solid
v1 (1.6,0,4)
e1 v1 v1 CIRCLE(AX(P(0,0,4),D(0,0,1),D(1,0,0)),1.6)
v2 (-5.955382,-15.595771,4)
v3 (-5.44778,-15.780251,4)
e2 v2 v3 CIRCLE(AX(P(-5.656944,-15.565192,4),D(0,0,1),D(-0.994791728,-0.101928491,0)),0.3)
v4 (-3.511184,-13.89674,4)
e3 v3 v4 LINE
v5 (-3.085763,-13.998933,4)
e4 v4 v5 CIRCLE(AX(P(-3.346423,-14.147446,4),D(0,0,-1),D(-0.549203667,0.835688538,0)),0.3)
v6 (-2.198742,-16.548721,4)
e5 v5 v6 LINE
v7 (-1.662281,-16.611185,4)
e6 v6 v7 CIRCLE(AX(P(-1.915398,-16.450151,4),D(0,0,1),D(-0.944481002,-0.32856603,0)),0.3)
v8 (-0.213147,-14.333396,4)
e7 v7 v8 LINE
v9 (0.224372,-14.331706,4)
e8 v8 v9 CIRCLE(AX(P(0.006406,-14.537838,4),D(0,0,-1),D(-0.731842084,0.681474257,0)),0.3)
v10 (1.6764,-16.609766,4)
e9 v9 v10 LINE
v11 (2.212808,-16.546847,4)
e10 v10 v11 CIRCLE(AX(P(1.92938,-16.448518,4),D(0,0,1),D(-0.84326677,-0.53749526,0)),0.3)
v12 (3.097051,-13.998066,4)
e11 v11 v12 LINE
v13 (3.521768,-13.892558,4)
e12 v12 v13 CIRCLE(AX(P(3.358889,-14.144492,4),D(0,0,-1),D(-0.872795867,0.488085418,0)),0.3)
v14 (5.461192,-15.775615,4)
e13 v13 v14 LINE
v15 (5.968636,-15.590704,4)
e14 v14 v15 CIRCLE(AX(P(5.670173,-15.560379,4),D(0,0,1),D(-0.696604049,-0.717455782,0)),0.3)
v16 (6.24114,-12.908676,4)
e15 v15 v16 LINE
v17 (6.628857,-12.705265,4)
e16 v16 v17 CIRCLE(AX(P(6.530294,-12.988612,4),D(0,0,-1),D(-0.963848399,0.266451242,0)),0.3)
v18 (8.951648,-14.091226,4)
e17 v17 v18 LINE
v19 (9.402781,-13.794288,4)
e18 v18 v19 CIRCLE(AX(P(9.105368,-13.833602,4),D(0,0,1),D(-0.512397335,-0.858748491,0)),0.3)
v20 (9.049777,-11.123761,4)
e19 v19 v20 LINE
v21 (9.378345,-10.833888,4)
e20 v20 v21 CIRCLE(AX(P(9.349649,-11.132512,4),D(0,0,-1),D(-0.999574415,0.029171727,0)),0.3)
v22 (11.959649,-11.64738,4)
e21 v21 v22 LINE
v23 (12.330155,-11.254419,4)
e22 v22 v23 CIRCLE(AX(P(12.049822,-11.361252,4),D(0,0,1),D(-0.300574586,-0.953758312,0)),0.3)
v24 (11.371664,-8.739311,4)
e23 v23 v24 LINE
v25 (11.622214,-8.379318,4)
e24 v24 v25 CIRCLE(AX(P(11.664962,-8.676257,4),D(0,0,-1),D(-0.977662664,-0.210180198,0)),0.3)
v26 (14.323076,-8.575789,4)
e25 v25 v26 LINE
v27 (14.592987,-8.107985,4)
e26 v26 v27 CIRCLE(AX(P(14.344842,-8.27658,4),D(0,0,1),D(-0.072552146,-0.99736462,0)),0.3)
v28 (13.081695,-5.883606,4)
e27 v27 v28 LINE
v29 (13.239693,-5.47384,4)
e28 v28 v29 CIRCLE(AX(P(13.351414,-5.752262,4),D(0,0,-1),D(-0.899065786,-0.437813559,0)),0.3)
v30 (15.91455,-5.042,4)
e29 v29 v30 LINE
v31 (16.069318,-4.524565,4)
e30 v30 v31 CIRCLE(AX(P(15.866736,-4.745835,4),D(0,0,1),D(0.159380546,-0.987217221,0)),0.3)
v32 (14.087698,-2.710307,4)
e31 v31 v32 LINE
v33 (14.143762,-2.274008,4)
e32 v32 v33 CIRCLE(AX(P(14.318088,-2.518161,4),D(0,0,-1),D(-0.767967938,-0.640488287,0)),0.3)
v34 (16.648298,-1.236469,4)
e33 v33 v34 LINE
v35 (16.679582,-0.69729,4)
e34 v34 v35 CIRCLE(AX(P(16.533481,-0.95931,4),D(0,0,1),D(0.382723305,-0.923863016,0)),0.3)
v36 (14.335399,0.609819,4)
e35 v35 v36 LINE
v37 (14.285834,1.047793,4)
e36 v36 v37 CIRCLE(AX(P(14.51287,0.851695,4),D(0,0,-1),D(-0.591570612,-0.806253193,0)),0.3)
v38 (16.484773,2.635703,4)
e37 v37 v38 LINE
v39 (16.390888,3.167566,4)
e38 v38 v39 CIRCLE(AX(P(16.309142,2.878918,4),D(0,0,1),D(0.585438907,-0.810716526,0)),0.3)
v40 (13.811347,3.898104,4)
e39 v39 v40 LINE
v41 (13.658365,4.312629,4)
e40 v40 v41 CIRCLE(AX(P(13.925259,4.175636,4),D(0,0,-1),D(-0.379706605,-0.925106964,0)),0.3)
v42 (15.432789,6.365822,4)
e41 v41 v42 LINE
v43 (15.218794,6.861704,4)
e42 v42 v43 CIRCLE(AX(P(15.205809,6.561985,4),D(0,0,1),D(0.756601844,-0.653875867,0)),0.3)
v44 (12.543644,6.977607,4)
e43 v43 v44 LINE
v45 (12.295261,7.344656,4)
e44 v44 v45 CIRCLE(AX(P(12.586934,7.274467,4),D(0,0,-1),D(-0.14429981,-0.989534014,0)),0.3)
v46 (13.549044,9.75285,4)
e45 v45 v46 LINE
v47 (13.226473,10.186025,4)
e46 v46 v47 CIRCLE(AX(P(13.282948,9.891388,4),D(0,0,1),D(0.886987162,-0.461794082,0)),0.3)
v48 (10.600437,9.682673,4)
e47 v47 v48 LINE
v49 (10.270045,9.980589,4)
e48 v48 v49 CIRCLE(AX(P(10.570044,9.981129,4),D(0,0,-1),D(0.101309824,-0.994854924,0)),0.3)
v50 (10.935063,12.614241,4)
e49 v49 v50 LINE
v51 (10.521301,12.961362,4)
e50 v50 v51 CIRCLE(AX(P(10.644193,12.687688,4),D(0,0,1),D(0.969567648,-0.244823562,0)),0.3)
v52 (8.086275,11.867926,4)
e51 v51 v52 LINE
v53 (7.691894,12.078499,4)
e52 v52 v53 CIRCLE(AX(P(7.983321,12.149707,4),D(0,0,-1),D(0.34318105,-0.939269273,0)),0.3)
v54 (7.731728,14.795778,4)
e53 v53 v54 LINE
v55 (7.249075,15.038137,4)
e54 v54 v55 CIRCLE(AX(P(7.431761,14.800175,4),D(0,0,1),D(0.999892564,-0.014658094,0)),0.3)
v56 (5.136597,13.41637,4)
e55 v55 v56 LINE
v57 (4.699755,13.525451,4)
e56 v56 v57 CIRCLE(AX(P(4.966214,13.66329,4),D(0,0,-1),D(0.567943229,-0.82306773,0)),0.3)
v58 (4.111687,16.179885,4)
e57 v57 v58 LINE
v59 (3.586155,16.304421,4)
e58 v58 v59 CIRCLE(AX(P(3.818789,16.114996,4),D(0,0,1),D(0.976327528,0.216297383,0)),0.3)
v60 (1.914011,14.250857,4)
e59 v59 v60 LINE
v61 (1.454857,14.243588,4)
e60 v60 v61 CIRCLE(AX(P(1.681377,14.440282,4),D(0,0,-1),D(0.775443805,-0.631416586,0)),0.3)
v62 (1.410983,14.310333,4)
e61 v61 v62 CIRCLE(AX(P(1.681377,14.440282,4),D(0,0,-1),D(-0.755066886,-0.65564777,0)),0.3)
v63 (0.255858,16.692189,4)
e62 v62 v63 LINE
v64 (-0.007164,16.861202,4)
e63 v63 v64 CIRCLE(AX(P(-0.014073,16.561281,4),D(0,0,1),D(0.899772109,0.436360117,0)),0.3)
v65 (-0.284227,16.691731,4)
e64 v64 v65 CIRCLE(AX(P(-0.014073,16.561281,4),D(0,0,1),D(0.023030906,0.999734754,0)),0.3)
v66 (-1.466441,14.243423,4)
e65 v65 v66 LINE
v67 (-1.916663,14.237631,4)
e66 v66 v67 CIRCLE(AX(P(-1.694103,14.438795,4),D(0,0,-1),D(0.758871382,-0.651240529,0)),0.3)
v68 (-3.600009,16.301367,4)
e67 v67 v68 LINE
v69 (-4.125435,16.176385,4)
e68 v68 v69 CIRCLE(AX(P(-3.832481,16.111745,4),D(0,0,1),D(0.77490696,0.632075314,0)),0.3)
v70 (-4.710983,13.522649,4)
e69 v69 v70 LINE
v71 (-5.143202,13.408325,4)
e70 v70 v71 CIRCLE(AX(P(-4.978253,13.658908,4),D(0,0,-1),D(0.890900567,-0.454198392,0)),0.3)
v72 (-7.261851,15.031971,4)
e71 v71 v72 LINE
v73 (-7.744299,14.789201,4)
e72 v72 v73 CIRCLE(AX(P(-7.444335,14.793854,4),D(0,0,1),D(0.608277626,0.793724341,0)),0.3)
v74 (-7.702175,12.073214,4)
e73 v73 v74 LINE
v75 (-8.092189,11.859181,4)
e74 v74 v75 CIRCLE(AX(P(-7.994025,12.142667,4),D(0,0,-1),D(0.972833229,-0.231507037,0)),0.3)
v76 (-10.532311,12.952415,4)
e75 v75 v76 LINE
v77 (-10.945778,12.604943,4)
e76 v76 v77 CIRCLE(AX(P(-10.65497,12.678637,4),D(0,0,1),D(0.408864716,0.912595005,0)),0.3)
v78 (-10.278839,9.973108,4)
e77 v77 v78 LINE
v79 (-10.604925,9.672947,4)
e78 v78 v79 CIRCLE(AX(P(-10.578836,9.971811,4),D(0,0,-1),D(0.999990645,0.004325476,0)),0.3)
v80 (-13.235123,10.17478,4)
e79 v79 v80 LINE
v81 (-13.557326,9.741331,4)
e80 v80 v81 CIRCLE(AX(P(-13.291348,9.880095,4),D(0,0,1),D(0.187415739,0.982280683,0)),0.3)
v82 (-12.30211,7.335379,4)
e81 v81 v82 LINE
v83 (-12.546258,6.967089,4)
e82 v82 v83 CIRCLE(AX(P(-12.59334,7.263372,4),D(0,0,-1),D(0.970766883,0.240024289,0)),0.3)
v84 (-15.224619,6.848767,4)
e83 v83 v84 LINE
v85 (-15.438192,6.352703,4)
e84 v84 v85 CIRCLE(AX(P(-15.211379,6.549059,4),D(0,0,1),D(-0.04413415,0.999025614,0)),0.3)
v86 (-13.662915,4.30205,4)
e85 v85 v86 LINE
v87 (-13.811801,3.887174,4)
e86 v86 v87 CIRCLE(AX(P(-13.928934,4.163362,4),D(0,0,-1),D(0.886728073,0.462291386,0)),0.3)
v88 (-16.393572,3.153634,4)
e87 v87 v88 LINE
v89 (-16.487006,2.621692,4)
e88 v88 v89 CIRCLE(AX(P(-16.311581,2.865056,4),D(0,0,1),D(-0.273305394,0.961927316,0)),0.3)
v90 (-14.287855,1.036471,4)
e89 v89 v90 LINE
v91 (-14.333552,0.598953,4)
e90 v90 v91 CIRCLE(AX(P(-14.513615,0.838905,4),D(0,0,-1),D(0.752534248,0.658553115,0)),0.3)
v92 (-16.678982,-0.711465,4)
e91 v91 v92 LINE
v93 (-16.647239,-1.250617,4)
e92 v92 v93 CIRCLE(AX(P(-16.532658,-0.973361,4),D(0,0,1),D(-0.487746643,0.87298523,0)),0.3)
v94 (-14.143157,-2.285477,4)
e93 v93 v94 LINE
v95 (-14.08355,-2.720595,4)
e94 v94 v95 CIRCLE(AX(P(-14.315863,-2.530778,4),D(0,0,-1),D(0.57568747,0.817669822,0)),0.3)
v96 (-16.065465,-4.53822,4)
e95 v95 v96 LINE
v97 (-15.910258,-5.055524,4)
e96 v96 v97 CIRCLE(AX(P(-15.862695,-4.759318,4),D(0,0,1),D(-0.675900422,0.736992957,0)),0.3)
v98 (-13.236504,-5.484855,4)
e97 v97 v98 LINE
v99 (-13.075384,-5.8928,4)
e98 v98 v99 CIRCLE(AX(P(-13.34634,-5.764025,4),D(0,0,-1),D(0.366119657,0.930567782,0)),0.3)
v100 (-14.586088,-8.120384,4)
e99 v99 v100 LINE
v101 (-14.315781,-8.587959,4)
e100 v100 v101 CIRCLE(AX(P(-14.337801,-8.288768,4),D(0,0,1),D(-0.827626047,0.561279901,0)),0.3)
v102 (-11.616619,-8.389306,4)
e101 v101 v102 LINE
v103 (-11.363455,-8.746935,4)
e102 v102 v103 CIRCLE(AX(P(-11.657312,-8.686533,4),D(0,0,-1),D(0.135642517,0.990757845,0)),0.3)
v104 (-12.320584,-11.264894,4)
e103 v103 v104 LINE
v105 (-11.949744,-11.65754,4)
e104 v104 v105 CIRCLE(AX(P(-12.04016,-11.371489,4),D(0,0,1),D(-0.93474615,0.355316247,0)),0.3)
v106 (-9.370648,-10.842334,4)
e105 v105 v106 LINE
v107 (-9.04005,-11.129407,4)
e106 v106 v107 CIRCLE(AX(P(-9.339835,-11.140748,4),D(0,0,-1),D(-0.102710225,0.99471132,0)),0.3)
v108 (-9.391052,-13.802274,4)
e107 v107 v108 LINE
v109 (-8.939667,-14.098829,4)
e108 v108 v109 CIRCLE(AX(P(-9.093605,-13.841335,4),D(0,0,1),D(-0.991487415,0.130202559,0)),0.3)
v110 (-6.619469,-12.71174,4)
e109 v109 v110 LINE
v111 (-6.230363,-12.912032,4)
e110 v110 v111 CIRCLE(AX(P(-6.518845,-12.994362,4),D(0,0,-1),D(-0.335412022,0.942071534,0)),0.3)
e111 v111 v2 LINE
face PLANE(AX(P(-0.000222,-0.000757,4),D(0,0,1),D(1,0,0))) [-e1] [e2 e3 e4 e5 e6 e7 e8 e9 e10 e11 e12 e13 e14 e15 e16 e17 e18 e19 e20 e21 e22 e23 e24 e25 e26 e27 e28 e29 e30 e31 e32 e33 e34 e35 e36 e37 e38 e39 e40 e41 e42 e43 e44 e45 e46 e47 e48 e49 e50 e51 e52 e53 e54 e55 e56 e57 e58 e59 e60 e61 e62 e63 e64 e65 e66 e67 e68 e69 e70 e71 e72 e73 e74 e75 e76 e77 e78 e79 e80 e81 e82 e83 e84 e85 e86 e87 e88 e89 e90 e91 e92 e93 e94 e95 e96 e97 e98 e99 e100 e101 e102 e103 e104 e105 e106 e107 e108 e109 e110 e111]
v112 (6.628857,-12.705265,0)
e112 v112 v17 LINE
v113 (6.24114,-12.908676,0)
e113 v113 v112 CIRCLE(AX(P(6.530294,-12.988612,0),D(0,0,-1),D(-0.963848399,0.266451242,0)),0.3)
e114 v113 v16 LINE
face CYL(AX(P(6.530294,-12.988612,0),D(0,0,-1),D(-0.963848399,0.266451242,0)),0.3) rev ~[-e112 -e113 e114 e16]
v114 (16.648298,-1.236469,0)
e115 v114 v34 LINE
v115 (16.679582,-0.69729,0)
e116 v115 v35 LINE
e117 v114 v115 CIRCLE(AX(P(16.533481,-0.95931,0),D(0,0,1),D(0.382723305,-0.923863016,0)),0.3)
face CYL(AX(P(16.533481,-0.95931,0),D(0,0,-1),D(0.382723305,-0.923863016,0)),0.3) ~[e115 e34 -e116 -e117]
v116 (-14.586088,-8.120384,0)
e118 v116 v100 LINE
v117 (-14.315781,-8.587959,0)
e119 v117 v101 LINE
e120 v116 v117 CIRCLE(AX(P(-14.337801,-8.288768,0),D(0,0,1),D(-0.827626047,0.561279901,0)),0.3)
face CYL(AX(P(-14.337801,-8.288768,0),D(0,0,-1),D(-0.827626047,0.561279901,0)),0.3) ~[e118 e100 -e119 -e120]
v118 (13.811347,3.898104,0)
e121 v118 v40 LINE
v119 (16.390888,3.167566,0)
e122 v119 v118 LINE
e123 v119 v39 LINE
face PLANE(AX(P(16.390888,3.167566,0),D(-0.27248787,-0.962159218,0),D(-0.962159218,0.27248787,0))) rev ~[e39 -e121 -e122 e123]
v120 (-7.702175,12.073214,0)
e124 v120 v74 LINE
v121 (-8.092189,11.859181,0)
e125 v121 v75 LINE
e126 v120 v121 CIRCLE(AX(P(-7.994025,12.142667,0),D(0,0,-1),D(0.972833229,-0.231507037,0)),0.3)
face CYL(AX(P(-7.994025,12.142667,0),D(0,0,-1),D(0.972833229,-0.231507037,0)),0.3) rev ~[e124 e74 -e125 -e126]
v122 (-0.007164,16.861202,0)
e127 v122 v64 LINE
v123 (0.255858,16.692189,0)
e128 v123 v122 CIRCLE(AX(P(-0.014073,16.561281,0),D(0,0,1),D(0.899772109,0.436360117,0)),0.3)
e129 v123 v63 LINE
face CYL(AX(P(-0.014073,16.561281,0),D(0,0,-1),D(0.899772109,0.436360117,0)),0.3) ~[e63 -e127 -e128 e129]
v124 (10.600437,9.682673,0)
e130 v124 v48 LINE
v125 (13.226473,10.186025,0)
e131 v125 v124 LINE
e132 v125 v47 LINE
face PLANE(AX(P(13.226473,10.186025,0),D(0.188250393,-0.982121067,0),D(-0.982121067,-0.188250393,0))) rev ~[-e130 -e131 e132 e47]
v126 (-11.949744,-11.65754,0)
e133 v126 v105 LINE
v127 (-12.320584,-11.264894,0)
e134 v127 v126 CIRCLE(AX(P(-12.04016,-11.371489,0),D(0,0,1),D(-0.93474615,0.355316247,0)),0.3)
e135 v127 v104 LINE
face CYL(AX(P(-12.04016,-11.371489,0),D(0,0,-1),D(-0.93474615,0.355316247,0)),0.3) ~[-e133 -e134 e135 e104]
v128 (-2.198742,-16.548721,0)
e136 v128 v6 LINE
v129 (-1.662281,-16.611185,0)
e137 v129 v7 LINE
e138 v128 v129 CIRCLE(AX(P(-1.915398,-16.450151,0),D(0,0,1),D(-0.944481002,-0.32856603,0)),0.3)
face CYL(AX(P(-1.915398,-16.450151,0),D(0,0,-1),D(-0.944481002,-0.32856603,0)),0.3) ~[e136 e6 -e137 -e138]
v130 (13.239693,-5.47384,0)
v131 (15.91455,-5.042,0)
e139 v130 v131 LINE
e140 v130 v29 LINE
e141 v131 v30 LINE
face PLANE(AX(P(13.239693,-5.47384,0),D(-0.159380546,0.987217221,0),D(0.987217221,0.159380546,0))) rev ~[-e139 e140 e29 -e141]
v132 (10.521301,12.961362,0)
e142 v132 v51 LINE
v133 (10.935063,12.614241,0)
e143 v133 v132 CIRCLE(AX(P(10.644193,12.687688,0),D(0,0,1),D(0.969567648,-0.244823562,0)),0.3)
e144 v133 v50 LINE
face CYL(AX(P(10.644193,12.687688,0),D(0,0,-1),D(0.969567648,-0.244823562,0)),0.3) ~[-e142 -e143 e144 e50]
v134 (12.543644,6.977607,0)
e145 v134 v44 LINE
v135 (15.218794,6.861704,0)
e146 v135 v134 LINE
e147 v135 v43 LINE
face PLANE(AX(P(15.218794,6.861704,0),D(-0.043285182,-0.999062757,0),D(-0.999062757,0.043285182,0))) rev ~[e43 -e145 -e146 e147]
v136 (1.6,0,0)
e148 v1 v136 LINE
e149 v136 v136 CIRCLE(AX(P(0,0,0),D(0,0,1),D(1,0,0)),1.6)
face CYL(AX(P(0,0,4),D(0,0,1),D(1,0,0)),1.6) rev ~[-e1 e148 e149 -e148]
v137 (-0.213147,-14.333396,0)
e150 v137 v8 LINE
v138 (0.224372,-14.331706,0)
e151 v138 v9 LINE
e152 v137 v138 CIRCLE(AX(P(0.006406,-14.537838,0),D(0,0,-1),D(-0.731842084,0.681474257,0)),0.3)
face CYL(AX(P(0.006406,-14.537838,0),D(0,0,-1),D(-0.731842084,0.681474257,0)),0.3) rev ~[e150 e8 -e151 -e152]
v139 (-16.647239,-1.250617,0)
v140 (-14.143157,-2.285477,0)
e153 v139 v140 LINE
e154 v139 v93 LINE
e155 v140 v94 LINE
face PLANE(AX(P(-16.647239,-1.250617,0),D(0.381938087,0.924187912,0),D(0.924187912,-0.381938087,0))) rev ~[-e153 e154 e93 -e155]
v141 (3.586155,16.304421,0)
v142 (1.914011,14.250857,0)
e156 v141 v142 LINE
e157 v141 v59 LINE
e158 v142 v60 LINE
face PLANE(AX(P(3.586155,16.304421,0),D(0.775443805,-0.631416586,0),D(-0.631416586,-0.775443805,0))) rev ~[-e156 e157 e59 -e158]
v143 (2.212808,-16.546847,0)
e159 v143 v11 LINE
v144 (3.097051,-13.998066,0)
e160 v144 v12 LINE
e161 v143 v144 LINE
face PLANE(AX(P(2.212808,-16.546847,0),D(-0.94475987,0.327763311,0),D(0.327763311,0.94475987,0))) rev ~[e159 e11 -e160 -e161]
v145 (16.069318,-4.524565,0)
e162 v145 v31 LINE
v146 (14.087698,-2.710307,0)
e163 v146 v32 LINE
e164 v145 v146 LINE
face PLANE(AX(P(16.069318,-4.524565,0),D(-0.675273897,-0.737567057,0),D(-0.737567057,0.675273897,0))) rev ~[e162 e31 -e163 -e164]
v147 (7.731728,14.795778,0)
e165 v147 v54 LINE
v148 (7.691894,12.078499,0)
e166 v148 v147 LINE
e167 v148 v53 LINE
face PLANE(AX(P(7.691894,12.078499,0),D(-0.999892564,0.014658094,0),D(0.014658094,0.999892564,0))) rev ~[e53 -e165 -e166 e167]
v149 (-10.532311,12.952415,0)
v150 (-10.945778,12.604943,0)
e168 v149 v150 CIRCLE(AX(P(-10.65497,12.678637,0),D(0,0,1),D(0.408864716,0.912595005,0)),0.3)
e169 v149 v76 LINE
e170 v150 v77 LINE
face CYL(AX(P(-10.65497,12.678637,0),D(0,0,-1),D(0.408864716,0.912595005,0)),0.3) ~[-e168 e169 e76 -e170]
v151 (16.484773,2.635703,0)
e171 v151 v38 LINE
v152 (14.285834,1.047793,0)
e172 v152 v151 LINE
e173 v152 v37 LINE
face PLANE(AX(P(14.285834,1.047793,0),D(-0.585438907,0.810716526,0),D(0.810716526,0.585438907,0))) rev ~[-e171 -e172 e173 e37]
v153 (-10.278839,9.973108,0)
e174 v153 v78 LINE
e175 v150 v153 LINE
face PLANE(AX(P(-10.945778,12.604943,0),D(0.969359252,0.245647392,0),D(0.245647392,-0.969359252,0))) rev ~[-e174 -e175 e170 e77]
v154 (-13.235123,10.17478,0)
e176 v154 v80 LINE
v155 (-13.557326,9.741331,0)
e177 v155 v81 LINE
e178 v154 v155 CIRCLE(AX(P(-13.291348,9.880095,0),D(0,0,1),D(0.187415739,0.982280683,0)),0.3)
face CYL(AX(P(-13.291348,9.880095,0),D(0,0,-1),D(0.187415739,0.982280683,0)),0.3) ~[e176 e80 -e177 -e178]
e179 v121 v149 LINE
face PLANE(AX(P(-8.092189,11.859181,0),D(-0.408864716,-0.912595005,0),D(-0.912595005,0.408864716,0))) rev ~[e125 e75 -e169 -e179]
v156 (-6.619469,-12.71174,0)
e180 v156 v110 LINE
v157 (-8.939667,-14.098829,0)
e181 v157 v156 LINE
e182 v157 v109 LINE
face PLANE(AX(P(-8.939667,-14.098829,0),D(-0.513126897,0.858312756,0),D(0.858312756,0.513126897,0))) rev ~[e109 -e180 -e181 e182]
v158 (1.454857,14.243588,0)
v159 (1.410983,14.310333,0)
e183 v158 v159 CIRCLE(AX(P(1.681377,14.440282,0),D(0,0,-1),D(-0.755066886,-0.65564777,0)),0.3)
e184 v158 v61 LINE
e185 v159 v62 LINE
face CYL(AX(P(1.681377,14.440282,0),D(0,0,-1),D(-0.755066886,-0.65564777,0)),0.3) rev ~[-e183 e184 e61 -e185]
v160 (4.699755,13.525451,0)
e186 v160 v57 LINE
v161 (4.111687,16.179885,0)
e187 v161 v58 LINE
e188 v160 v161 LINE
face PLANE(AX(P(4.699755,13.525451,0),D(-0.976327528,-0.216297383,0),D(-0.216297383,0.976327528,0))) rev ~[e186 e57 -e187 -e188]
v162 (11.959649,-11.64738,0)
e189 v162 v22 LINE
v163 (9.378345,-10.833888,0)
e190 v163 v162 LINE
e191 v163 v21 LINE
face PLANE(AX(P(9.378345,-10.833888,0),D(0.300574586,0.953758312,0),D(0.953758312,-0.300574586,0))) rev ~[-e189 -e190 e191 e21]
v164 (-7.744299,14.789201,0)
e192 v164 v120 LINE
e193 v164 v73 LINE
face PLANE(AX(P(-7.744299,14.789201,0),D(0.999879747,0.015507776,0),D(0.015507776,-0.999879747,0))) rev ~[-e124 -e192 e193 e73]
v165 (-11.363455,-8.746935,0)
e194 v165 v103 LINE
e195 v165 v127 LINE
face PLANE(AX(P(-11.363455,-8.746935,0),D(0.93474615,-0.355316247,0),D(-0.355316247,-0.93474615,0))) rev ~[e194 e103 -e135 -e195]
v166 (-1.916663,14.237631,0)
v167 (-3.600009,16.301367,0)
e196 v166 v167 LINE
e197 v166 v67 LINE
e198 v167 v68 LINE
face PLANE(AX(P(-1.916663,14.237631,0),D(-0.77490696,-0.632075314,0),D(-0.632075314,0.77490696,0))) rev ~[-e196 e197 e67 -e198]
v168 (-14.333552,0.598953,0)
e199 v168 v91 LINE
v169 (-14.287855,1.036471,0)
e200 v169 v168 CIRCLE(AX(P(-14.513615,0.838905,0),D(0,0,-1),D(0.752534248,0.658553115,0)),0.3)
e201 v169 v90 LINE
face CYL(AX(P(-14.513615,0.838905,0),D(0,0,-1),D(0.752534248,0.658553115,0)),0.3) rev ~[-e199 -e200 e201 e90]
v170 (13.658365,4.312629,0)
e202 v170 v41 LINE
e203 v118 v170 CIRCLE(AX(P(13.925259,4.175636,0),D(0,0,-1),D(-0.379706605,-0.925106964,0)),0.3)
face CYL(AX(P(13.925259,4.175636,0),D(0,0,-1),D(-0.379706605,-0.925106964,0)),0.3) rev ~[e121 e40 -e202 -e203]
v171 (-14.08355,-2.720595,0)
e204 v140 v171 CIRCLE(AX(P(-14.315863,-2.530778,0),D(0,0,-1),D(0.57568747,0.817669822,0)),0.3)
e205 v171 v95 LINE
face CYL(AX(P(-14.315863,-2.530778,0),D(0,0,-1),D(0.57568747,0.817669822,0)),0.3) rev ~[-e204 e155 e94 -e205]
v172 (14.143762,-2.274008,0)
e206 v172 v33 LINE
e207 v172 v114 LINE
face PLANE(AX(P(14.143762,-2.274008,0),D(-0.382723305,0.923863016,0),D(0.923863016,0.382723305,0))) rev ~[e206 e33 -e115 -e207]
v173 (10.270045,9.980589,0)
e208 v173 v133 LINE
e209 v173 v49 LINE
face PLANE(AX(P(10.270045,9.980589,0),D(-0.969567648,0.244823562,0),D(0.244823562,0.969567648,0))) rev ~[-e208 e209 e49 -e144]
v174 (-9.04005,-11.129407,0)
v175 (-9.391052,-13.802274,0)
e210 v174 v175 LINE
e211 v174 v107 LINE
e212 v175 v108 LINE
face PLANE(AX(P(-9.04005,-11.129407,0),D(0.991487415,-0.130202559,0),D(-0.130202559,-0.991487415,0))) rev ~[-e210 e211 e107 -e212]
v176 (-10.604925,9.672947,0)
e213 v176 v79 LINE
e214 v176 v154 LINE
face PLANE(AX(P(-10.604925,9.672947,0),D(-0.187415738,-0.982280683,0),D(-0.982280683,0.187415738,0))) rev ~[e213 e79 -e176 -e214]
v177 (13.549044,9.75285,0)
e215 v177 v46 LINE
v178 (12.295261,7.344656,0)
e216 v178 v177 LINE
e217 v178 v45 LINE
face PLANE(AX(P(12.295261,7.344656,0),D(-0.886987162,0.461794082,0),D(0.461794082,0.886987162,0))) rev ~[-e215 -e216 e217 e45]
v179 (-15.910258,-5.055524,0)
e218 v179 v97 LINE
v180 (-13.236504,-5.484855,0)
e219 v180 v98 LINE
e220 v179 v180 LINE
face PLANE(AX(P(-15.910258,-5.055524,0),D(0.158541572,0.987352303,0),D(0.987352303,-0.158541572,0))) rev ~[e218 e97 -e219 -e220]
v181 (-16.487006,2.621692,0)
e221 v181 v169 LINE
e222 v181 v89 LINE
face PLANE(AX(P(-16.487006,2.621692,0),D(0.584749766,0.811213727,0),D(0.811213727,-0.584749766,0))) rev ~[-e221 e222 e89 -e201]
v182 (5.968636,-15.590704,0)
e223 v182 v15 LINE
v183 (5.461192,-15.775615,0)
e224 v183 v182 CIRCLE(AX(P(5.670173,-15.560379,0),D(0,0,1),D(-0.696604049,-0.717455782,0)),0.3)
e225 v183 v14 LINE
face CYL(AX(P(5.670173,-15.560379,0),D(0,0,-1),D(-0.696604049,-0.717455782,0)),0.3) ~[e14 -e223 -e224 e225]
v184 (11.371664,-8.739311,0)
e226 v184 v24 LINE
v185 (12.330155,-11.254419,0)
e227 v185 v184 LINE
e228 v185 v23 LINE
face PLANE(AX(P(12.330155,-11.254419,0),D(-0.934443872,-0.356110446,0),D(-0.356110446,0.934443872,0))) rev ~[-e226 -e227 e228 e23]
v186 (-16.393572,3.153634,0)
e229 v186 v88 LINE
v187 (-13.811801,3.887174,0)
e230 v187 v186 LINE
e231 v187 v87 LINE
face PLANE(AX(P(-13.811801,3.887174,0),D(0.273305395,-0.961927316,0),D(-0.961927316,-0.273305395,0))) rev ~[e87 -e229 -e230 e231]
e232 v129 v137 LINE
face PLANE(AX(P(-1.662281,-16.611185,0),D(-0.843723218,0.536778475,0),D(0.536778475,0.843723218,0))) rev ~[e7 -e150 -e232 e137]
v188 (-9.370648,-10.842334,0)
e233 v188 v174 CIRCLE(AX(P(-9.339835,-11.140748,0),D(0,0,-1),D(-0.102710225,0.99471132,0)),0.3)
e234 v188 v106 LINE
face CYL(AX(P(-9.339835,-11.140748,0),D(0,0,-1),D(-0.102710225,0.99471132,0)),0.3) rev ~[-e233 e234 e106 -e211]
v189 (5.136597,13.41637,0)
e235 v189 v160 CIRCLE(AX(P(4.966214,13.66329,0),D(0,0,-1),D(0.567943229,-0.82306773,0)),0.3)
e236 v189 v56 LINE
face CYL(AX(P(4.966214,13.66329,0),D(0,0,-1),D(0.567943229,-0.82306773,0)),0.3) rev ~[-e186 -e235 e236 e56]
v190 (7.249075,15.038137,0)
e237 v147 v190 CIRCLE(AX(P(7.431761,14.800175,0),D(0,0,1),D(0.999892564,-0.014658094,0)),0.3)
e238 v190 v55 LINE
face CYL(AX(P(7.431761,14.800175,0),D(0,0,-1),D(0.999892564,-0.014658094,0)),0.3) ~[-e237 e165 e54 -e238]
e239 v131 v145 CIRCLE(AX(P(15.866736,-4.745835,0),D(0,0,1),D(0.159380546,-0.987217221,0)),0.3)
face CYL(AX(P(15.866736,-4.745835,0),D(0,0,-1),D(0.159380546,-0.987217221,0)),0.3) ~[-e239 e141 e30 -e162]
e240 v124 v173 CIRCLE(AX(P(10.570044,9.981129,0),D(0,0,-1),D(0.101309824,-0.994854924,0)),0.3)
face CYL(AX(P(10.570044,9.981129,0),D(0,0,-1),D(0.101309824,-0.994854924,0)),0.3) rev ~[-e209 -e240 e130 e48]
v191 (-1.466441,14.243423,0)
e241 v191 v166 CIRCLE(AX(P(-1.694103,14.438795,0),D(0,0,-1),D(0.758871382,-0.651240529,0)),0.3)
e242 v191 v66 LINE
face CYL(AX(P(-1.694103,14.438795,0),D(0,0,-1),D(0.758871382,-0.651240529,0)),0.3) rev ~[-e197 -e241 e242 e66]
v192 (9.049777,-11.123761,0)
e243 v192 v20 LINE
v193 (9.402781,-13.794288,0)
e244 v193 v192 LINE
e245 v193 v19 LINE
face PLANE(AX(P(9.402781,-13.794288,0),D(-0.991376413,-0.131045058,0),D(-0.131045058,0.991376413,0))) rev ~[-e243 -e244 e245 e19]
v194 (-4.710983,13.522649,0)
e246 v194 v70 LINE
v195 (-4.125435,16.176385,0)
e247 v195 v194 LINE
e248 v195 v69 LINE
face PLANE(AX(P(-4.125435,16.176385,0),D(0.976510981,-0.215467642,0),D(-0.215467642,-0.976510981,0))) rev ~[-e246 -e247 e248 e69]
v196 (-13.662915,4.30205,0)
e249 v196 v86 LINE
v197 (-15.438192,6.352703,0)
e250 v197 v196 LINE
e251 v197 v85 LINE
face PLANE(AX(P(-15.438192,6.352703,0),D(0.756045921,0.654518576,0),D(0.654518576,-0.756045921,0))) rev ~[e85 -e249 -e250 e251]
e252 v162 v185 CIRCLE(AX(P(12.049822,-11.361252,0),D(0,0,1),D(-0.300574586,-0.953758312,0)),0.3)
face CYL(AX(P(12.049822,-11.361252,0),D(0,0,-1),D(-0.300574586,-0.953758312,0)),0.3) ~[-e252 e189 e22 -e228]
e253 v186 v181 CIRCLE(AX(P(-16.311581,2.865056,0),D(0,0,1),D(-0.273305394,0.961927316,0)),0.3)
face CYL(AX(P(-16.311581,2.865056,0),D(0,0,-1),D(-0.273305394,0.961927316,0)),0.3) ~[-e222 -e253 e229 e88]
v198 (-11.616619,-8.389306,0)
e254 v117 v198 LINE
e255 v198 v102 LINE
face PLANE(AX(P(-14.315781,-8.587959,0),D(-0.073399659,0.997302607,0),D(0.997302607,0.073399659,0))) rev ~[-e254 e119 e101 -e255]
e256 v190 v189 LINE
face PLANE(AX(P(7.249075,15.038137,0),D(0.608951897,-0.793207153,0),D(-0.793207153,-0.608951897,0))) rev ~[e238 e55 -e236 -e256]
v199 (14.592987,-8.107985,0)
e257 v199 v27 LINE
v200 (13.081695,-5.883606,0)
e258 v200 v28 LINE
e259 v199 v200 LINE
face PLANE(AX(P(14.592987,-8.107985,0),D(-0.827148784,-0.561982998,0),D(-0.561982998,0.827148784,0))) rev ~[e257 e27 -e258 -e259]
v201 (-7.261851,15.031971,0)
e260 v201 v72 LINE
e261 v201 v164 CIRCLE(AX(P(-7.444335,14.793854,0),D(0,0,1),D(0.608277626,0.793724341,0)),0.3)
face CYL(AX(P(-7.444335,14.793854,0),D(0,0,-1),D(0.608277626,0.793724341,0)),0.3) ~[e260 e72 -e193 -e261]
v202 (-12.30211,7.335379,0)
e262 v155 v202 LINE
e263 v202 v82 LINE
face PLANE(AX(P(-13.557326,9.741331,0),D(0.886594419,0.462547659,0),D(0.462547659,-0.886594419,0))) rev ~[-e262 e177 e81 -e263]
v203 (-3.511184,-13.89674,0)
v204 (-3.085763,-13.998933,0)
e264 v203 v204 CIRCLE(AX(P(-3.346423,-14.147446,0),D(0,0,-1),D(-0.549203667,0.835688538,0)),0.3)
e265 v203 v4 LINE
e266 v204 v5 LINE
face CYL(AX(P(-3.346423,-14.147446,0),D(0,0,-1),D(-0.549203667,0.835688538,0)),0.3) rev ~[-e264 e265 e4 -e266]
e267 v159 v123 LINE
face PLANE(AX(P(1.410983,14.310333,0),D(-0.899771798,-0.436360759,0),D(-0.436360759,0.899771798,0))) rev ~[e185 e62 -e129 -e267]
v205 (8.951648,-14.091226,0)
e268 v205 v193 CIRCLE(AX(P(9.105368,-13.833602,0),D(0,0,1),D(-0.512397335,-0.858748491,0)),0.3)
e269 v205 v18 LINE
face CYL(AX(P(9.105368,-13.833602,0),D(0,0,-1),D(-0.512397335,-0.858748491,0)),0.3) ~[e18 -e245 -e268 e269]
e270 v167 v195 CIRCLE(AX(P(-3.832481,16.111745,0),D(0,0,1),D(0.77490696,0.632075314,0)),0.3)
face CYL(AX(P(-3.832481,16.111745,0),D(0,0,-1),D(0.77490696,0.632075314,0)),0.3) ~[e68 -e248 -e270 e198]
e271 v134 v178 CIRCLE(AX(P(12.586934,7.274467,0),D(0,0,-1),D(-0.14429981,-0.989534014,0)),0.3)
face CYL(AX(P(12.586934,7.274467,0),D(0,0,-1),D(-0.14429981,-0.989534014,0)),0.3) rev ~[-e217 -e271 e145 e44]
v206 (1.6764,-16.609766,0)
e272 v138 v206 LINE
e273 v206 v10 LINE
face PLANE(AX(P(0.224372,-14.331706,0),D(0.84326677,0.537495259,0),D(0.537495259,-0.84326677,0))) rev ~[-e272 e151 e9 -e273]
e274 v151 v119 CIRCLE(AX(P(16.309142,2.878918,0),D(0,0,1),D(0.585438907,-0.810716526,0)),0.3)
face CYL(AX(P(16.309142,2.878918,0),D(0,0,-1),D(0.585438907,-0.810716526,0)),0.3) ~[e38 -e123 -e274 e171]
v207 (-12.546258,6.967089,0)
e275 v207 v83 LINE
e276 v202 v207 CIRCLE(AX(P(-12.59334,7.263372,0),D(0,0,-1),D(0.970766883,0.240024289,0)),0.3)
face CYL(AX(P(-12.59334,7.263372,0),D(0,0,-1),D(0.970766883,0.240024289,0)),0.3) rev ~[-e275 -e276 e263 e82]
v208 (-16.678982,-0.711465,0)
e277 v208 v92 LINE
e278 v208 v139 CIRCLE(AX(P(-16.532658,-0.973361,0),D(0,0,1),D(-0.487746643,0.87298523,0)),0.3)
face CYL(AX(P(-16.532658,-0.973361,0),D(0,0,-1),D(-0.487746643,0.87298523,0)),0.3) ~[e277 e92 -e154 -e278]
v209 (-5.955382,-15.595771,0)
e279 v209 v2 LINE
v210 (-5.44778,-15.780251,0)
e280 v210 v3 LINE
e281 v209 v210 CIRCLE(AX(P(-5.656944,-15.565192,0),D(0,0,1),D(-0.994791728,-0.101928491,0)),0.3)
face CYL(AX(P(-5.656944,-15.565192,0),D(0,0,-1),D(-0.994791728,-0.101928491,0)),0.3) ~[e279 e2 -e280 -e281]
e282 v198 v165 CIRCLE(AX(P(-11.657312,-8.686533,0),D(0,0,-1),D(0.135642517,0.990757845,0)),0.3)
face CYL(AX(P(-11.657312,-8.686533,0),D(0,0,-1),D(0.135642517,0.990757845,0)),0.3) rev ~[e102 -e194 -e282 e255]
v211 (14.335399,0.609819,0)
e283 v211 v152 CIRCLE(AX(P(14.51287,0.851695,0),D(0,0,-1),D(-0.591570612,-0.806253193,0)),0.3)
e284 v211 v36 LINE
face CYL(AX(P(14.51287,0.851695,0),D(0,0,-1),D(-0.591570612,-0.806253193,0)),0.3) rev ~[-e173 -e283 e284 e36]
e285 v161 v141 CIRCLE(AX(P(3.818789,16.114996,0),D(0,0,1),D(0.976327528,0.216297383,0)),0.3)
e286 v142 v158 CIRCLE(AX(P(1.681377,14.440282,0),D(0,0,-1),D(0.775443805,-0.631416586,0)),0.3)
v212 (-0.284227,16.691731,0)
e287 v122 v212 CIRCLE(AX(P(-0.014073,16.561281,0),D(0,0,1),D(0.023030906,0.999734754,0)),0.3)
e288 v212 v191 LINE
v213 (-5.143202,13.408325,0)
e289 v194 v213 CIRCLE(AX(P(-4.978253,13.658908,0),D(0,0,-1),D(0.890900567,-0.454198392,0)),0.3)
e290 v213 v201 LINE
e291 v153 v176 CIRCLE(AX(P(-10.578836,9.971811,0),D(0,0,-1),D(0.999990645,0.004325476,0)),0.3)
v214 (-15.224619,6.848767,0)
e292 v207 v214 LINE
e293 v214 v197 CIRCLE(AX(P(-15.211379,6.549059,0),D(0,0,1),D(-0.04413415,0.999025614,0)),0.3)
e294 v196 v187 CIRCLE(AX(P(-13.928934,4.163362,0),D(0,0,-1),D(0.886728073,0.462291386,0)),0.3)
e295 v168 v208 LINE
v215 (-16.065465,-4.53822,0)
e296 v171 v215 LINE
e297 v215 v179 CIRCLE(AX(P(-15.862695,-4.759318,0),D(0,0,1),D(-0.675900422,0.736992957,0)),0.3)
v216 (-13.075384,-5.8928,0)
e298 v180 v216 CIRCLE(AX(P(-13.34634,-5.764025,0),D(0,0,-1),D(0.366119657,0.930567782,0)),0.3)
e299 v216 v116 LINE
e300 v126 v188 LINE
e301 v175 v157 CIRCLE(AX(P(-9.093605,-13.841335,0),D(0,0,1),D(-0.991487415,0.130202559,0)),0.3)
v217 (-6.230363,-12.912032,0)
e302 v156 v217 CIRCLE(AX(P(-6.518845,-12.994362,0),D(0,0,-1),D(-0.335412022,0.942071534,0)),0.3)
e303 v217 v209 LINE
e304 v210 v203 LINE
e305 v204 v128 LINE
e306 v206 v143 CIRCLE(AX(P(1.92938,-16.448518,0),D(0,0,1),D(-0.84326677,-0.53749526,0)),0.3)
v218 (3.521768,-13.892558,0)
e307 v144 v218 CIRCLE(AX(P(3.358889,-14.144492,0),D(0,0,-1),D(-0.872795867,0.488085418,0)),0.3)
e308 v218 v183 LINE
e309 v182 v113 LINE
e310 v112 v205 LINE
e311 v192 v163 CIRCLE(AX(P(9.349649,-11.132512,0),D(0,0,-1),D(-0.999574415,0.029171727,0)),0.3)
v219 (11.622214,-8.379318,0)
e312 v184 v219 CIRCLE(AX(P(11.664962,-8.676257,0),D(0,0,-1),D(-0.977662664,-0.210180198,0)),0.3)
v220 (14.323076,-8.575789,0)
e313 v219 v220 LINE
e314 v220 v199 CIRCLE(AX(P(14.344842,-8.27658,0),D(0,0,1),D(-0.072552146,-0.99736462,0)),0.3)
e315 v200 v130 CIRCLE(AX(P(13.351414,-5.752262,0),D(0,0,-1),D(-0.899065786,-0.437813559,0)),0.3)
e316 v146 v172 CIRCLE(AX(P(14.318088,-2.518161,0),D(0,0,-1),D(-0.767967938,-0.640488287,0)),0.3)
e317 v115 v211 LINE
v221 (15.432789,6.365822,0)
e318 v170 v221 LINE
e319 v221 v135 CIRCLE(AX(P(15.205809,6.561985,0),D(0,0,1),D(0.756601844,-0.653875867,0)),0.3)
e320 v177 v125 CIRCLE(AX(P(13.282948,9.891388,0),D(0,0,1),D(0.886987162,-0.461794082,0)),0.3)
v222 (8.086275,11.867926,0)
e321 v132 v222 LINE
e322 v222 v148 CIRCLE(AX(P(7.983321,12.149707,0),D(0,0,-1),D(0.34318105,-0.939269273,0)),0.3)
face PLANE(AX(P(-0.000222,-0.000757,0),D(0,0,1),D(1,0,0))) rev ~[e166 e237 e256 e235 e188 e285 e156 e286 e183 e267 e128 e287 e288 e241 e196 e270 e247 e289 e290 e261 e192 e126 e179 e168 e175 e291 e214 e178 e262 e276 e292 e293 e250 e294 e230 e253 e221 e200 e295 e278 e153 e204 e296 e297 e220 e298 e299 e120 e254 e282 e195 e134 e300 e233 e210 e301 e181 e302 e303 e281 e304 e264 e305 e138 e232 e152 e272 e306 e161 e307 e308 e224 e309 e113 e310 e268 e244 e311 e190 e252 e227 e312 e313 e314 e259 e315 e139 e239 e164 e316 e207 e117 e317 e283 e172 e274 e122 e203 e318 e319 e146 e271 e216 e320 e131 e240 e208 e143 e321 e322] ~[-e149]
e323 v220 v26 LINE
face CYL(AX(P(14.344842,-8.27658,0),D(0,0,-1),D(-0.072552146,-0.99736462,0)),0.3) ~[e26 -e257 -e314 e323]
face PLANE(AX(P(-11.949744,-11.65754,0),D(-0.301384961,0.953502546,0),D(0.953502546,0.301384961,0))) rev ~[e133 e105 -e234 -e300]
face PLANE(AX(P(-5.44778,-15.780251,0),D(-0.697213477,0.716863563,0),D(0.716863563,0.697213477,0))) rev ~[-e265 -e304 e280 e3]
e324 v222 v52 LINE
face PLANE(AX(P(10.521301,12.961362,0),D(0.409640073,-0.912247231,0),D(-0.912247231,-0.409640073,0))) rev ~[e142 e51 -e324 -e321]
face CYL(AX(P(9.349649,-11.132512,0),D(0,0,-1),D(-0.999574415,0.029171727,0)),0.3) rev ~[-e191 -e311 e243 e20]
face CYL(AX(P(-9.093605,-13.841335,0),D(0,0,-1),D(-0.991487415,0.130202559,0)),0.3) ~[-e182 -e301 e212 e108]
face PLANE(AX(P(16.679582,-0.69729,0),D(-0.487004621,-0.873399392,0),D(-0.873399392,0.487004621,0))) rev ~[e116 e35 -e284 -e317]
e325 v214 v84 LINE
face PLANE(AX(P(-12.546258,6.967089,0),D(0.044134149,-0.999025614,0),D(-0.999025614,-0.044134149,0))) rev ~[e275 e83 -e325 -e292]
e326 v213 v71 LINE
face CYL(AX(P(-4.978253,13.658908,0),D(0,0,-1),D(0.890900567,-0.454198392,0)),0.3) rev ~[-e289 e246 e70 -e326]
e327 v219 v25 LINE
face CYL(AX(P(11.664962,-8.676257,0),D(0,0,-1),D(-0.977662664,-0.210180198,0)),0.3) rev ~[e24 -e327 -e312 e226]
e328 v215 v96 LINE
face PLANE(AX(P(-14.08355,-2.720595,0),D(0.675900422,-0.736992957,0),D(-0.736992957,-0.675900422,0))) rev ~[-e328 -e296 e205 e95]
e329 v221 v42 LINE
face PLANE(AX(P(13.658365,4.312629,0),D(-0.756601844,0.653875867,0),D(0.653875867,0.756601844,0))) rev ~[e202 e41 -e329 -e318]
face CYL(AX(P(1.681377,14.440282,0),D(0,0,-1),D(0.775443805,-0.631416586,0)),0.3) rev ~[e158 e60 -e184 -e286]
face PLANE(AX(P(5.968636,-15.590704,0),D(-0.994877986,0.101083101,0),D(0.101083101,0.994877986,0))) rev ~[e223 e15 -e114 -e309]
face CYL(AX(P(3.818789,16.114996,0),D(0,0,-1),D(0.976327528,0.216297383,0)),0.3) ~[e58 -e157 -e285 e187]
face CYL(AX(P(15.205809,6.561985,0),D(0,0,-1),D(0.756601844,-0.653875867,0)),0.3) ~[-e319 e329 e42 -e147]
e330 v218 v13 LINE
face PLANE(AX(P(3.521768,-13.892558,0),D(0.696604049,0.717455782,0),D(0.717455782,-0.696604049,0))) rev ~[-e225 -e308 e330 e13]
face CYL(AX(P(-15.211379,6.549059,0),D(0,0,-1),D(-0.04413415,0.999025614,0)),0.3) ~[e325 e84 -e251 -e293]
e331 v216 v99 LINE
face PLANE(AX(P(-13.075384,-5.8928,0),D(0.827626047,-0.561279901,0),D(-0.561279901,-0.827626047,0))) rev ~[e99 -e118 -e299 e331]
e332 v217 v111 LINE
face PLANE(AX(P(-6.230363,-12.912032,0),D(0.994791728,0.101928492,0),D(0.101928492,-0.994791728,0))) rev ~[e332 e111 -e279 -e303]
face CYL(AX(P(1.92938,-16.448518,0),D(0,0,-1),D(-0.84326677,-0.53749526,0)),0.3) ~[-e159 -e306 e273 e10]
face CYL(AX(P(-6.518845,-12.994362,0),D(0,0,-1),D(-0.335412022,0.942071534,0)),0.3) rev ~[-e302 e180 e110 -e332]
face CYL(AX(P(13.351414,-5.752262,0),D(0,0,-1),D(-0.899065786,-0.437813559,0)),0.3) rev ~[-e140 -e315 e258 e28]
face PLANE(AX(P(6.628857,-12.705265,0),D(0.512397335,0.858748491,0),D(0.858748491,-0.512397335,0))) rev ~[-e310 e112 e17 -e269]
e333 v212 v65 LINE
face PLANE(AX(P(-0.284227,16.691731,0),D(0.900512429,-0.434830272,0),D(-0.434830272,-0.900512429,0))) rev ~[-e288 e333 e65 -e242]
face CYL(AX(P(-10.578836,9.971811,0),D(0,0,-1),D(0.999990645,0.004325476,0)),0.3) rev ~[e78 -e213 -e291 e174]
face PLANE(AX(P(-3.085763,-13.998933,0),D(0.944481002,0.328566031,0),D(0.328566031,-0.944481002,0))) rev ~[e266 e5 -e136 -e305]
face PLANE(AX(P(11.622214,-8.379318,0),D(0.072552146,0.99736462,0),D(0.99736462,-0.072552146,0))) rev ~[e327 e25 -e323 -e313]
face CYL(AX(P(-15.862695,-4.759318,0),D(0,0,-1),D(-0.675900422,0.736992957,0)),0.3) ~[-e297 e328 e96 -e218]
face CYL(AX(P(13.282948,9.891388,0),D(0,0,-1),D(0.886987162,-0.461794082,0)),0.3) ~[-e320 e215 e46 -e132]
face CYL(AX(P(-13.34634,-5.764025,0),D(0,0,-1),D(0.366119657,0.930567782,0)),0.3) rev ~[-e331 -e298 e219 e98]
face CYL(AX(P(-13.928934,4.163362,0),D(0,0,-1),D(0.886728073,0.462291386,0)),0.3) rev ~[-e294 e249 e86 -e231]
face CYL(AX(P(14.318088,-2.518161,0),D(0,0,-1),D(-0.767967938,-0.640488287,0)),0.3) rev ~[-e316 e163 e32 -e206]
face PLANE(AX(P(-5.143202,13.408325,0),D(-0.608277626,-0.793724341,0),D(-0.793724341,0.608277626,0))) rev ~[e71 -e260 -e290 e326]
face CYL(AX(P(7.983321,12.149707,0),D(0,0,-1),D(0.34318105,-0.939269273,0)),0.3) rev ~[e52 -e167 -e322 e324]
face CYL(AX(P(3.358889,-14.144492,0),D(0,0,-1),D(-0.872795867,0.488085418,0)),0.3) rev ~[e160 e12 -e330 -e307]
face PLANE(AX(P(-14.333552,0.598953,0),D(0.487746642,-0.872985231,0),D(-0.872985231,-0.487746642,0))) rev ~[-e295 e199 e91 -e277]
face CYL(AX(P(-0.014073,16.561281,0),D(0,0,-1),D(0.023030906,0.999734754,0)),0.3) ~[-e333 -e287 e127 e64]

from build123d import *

# Parameters (mm, degrees)
F1_DEPTH = 4
F2_R     = 1.6
F3_DEPTH = 4.001


# Not quite as in the source:
# - ends of sketch curves that miss each other by under 0.0002 mm in the source are joined


with BuildPart() as f1:
    # F0 (on Top) → F1 (new body)
    with BuildSketch(Plane.XY):
        with BuildLine():
            ThreePointArc((1.9140106254, 14.2508572736), (1.6861265158, 14.1403198405), (1.4548574179, 14.2435879186))
            ThreePointArc((1.4548574179, 14.2435879186), (1.4306890387, 14.2754935862), (1.4109831428, 14.3103326425))
            Line((1.4109831428, 14.3103326425), (0.2558581901, 16.6921894723))
            ThreePointArc((0.2558581901, 16.6921894723), (0.1481039871, 16.8136670177), (-0.0071641706, 16.8612018631))
            ThreePointArc((-0.0071641706, 16.8612018631), (-0.1706127192, 16.817202235), (-0.2842271711, 16.6917305187))
            Line((-0.2842271711, 16.6917305187), (-1.4664410979, 14.2434227482))
            ThreePointArc((-1.4664410979, 14.2434227482), (-1.6902437576, 14.1388197245), (-1.916663057, 14.237631282))
            Line((-1.916663057, 14.237631282), (-3.6000092117, 16.3013673957))
            ThreePointArc((-3.6000092117, 16.3013673957), (-3.9019049125, 16.4036015506), (-4.125434594, 16.1763850942))
            Line((-4.125434594, 16.1763850942), (-4.7109828334, 13.5226488797))
            ThreePointArc((-4.7109828334, 13.5226488797), (-4.9015400565, 13.3688823231), (-5.1432019185, 13.4083253663))
            Line((-5.1432019185, 13.4083253663), (-7.2618513891, 15.0319710101))
            ThreePointArc((-7.2618513891, 15.0319710101), (-7.579185331, 15.0618374778), (-7.7442986009, 14.7892013747))
            Line((-7.7442986009, 14.7892013747), (-7.702174618, 12.0732144933))
            ThreePointArc((-7.702174618, 12.0732144933), (-7.8496947229, 11.8796668128), (-8.0921885063, 11.8591814286))
            Line((-8.0921885063, 11.8591814286), (-10.532310636, 12.9524153773))
            ThreePointArc((-10.532310636, 12.9524153773), (-10.8479798704, 12.9083044823), (-10.9457778263, 12.604942658))
            Line((-10.9457778263, 12.604942658), (-10.2788390418, 9.9731081586))
            ThreePointArc((-10.2788390418, 9.9731081586), (-10.375659889, 9.7510858631), (-10.6049250215, 9.6729470431))
            Line((-10.6049250215, 9.6729470431), (-13.2351231204, 10.1747796938))
            ThreePointArc((-13.2351231204, 10.1747796938), (-13.5321144192, 10.0590688256), (-13.5573261675, 9.7413311912))
            Line((-13.5573261675, 9.7413311912), (-12.3021100194, 7.3353788314))
            ThreePointArc((-12.3021100194, 7.3353788314), (-12.3432937572, 7.097610167), (-12.5462575743, 6.967089184))
            Line((-12.5462575743, 6.967089184), (-15.2246187544, 6.8487666996))
            ThreePointArc((-15.2246187544, 6.8487666996), (-15.4869255508, 6.6676921814), (-15.4381922857, 6.3527034427))
            Line((-15.4381922857, 6.3527034427), (-13.6629152877, 4.3020497532))
            ThreePointArc((-13.6629152877, 4.3020497532), (-13.6465657396, 4.062029571), (-13.8118007442, 3.8871742342))
            Line((-13.8118007442, 3.8871742342), (-16.3935721919, 3.153634337))
            ThreePointArc((-16.3935721919, 3.153634337), (-16.6070572662, 2.9169553146), (-16.4870055032, 2.621692024))
            Line((-16.4870055032, 2.621692024), (-14.2878546387, 1.0364711274))
            ThreePointArc((-14.2878546387, 1.0364711274), (-14.2152379851, 0.8077409694), (-14.3335516124, 0.5989526815))
            Line((-14.3335516124, 0.5989526815), (-16.6789818187, -0.7114654884))
            ThreePointArc((-16.6789818187, -0.7114654884), (-16.832139234, -0.9909930232), (-16.6472392521, -1.2506174313))
            Line((-16.6472392521, -1.2506174313), (-14.1431571391, -2.2854765977))
            ThreePointArc((-14.1431571391, -2.2854765977), (-14.0186393167, -2.4900607643), (-14.0835502146, -2.7205948066))
            Line((-14.0835502146, -2.7205948066), (-16.0654652706, -4.5382203487))
            ThreePointArc((-16.0654652706, -4.5382203487), (-16.1500404943, -4.8455310516), (-15.9102576154, -5.0555239268))
            Line((-15.9102576154, -5.0555239268), (-13.2365040498, -5.4848550701))
            ThreePointArc((-13.2365040498, -5.4848550701), (-13.0673141606, -5.6538228156), (-13.0753841374, -5.8928002059))
            Line((-13.0753841374, -5.8928002059), (-14.5860884781, -8.1203844463))
            ThreePointArc((-14.5860884781, -8.1203844463), (-14.5975232656, -8.4389155785), (-14.3157807663, -8.5879591986))
            Line((-14.3157807663, -8.5879591986), (-11.6166191171, -8.3893058066))
            ThreePointArc((-11.6166191171, -8.3893058066), (-11.4124537807, -8.5131996233), (-11.3634554587, -8.746935215))
            Line((-11.3634554587, -8.746935215), (-12.3205835531, -11.2648943843))
            ThreePointArc((-12.3205835531, -11.2648943843), (-12.258261618, -11.5774784738), (-11.9497442197, -11.6575400221))
            Line((-11.9497442197, -11.6575400221), (-9.3706481648, -10.8423342647))
            ThreePointArc((-9.3706481648, -10.8423342647), (-9.143139116, -10.914229028), (-9.0400495076, -11.1294074585))
            Line((-9.0400495076, -11.1294074585), (-9.3910515674, -13.8022744624))
            ThreePointArc((-9.3910515674, -13.8022744624), (-9.2583317968, -14.0920645572), (-8.9396672739, -14.0988290571))
            Line((-8.9396672739, -14.0988290571), (-6.6194690015, -12.711740107))
            ThreePointArc((-6.6194690015, -12.711740107), (-6.3815431901, -12.7276255469), (-6.2303634454, -12.912031956))
            Line((-6.2303634454, -12.912031956), (-5.955381825, -15.5957706951))
            ThreePointArc((-5.955381825, -15.5957706951), (-5.7594172495, -15.8471483428), (-5.4477802634, -15.7802512165))
            Line((-5.4477802634, -15.7802512165), (-3.5111841497, -13.8967395131))
            ThreePointArc((-3.5111841497, -13.8967395131), (-3.2763512695, -13.8557442651), (-3.0857625615, -13.9989330789))
            Line((-3.0857625615, -13.9989330789), (-2.1987423004, -16.54872127))
            ThreePointArc((-2.1987423004, -16.54872127), (-1.9500945765, -16.7481382853), (-1.6622810343, -16.6111850031))
            Line((-1.6622810343, -16.6111850031), (-0.2131467972, -14.3333958211))
            ThreePointArc((-0.2131467972, -14.3333958211), (0.005246929, -14.2378403367), (0.2243723928, -14.331705673))
            Line((0.2243723928, -14.331705673), (1.6764001268, -16.6097662074))
            ThreePointArc((1.6764001268, -16.6097662074), (1.9643299452, -16.746474862), (2.2128081189, -16.546846623))
            Line((2.2128081189, -16.546846623), (3.0970506062, -13.9980658779))
            ThreePointArc((3.0970506062, -13.9980658779), (3.286561705, -13.8533408388), (3.521767647, -13.8925576515))
            Line((3.521767647, -13.8925576515), (5.4611917751, -15.775615445))
            ThreePointArc((5.4611917751, -15.775615445), (5.7728854965, -15.8422477244), (5.9686363857, -15.5907036409))
            Line((5.9686363857, -15.5907036409), (6.2411397895, -12.9086763338))
            ThreePointArc((6.2411397895, -12.9086763338), (6.3909195318, -12.7229527682), (6.6288572495, -12.7052650163))
            Line((6.6288572495, -12.7052650163), (8.9516484854, -14.0912261582))
            ThreePointArc((8.9516484854, -14.0912261582), (9.2703071449, -14.0841908662), (9.4027806099, -13.7942880935))
            Line((9.4027806099, -13.7942880935), (9.0497770711, -11.1237609685))
            ThreePointArc((9.0497770711, -11.1237609685), (9.1511783498, -10.9075475026), (9.3783451778, -10.8338880535))
            Line((9.3783451778, -10.8338880535), (11.9596494988, -11.6473797597))
            ThreePointArc((11.9596494988, -11.6473797597), (12.268098751, -11.5670560686), (12.3301550361, -11.2544191321))
            Line((12.3301550361, -11.2544191321), (11.3716636637, -8.7393106928))
            ThreePointArc((11.3716636637, -8.7393106928), (11.4187295037, -8.5048818109), (11.6222137202, -8.3793180118))
            Line((11.6222137202, -8.3793180118), (14.3230763647, -8.5757891676))
            ThreePointArc((14.3230763647, -8.5757891676), (14.604692108, -8.4265061824), (14.5929866434, -8.1079848822))
            Line((14.5929866434, -8.1079848822), (13.0816946487, -5.8836056031))
            ThreePointArc((13.0816946487, -5.8836056031), (13.0715015116, -5.644332005), (13.2396929757, -5.4738404035))
            Line((13.2396929757, -5.4738404035), (15.9145504354, -5.0420000401))
            ThreePointArc((15.9145504354, -5.0420000401), (16.15415478, -4.8318034782), (16.0693184405, -4.5245647566))
            Line((16.0693184405, -4.5245647566), (14.0876977194, -2.7103070117))
            ThreePointArc((14.0876977194, -2.7103070117), (14.0205346934, -2.4799248131), (14.1437623045, -2.2740078751))
            Line((14.1437623045, -2.2740078751), (16.648298033, -1.2364685688))
            ThreePointArc((16.648298033, -1.2364685688), (16.8329773247, -0.9766871303), (16.6795824278, -0.6972898464))
            Line((16.6795824278, -0.6972898464), (14.335398798, 0.6098192161))
            ThreePointArc((14.335398798, 0.6098192161), (14.2147728105, 0.8179597828), (14.2858336525, 1.0477933771))
            Line((14.2858336525, 1.0477933771), (16.4847732853, 2.6357032988))
            ThreePointArc((16.4847732853, 2.6357032988), (16.6045740963, 2.9310685003), (16.3908879741, 3.1675660221))
            Line((16.3908879741, 3.1675660221), (13.8113473036, 3.8981036809))
            ThreePointArc((13.8113473036, 3.8981036809), (13.6438142546, 4.0717671277), (13.6583646175, 4.3126293336))
            Line((13.6583646175, 4.3126293336), (15.4327894801, 6.3658219818))
            ThreePointArc((15.4327894801, 6.3658219818), (15.4812550566, 6.6808520192), (15.2187944815, 6.8617035691))
            Line((15.2187944815, 6.8617035691), (12.5436443132, 6.9776065604))
            ThreePointArc((12.5436443132, 6.9776065604), (12.3384761371, 7.1063341886), (12.2952606451, 7.3446558284))
            Line((12.2952606451, 7.3446558284), (13.5490440665, 9.7528499611))
            ThreePointArc((13.5490440665, 9.7528499611), (13.5235623203, 10.0705660564), (13.2264728, 10.1860245057))
            Line((13.2264728, 10.1860245057), (10.6004372903, 9.6826728997))
            ThreePointArc((10.6004372903, 9.6826728997), (10.3691452759, 9.7583299946), (10.2700448298, 9.9805890632))
            Line((10.2700448298, 9.9805890632), (10.9350629039, 12.6142408462))
            ThreePointArc((10.9350629039, 12.6142408462), (10.8370071926, 12.9175194542), (10.5213005877, 12.961362084))
            Line((10.5213005877, 12.961362084), (8.0862749191, 11.8679259428))
            ThreePointArc((8.0862749191, 11.8679259428), (7.8420206158, 11.8850667554), (7.6918940409, 12.0784988717))
            Line((7.6918940409, 12.0784988717), (7.7317284499, 14.7957778483))
            ThreePointArc((7.7317284499, 14.7957778483), (7.566383559, 15.0682735431), (7.2490751116, 15.0381374223))
            Line((7.2490751116, 15.0381374223), (5.1365969535, 13.4163699229))
            ThreePointArc((5.1365969535, 13.4163699229), (4.8935343549, 13.3722272394), (4.6997550083, 13.5254511546))
            Line((4.6997550083, 13.5254511546), (4.1116867961, 16.1798854092))
            ThreePointArc((4.1116867961, 16.1798854092), (3.8879641114, 16.4069118327), (3.5861553961, 16.3044211699))
            Line((3.5861553961, 16.3044211699), (1.9140106254, 14.2508572736))
        make_face()
    extrude(amount=F1_DEPTH)

    # F2 (on face) → F3 (cut, through all)
    with BuildSketch(Plane.XY.offset(4)):
        Circle(F2_R)
    extrude(amount=-F3_DEPTH, mode=Mode.SUBTRACT)


solid = f1.part
